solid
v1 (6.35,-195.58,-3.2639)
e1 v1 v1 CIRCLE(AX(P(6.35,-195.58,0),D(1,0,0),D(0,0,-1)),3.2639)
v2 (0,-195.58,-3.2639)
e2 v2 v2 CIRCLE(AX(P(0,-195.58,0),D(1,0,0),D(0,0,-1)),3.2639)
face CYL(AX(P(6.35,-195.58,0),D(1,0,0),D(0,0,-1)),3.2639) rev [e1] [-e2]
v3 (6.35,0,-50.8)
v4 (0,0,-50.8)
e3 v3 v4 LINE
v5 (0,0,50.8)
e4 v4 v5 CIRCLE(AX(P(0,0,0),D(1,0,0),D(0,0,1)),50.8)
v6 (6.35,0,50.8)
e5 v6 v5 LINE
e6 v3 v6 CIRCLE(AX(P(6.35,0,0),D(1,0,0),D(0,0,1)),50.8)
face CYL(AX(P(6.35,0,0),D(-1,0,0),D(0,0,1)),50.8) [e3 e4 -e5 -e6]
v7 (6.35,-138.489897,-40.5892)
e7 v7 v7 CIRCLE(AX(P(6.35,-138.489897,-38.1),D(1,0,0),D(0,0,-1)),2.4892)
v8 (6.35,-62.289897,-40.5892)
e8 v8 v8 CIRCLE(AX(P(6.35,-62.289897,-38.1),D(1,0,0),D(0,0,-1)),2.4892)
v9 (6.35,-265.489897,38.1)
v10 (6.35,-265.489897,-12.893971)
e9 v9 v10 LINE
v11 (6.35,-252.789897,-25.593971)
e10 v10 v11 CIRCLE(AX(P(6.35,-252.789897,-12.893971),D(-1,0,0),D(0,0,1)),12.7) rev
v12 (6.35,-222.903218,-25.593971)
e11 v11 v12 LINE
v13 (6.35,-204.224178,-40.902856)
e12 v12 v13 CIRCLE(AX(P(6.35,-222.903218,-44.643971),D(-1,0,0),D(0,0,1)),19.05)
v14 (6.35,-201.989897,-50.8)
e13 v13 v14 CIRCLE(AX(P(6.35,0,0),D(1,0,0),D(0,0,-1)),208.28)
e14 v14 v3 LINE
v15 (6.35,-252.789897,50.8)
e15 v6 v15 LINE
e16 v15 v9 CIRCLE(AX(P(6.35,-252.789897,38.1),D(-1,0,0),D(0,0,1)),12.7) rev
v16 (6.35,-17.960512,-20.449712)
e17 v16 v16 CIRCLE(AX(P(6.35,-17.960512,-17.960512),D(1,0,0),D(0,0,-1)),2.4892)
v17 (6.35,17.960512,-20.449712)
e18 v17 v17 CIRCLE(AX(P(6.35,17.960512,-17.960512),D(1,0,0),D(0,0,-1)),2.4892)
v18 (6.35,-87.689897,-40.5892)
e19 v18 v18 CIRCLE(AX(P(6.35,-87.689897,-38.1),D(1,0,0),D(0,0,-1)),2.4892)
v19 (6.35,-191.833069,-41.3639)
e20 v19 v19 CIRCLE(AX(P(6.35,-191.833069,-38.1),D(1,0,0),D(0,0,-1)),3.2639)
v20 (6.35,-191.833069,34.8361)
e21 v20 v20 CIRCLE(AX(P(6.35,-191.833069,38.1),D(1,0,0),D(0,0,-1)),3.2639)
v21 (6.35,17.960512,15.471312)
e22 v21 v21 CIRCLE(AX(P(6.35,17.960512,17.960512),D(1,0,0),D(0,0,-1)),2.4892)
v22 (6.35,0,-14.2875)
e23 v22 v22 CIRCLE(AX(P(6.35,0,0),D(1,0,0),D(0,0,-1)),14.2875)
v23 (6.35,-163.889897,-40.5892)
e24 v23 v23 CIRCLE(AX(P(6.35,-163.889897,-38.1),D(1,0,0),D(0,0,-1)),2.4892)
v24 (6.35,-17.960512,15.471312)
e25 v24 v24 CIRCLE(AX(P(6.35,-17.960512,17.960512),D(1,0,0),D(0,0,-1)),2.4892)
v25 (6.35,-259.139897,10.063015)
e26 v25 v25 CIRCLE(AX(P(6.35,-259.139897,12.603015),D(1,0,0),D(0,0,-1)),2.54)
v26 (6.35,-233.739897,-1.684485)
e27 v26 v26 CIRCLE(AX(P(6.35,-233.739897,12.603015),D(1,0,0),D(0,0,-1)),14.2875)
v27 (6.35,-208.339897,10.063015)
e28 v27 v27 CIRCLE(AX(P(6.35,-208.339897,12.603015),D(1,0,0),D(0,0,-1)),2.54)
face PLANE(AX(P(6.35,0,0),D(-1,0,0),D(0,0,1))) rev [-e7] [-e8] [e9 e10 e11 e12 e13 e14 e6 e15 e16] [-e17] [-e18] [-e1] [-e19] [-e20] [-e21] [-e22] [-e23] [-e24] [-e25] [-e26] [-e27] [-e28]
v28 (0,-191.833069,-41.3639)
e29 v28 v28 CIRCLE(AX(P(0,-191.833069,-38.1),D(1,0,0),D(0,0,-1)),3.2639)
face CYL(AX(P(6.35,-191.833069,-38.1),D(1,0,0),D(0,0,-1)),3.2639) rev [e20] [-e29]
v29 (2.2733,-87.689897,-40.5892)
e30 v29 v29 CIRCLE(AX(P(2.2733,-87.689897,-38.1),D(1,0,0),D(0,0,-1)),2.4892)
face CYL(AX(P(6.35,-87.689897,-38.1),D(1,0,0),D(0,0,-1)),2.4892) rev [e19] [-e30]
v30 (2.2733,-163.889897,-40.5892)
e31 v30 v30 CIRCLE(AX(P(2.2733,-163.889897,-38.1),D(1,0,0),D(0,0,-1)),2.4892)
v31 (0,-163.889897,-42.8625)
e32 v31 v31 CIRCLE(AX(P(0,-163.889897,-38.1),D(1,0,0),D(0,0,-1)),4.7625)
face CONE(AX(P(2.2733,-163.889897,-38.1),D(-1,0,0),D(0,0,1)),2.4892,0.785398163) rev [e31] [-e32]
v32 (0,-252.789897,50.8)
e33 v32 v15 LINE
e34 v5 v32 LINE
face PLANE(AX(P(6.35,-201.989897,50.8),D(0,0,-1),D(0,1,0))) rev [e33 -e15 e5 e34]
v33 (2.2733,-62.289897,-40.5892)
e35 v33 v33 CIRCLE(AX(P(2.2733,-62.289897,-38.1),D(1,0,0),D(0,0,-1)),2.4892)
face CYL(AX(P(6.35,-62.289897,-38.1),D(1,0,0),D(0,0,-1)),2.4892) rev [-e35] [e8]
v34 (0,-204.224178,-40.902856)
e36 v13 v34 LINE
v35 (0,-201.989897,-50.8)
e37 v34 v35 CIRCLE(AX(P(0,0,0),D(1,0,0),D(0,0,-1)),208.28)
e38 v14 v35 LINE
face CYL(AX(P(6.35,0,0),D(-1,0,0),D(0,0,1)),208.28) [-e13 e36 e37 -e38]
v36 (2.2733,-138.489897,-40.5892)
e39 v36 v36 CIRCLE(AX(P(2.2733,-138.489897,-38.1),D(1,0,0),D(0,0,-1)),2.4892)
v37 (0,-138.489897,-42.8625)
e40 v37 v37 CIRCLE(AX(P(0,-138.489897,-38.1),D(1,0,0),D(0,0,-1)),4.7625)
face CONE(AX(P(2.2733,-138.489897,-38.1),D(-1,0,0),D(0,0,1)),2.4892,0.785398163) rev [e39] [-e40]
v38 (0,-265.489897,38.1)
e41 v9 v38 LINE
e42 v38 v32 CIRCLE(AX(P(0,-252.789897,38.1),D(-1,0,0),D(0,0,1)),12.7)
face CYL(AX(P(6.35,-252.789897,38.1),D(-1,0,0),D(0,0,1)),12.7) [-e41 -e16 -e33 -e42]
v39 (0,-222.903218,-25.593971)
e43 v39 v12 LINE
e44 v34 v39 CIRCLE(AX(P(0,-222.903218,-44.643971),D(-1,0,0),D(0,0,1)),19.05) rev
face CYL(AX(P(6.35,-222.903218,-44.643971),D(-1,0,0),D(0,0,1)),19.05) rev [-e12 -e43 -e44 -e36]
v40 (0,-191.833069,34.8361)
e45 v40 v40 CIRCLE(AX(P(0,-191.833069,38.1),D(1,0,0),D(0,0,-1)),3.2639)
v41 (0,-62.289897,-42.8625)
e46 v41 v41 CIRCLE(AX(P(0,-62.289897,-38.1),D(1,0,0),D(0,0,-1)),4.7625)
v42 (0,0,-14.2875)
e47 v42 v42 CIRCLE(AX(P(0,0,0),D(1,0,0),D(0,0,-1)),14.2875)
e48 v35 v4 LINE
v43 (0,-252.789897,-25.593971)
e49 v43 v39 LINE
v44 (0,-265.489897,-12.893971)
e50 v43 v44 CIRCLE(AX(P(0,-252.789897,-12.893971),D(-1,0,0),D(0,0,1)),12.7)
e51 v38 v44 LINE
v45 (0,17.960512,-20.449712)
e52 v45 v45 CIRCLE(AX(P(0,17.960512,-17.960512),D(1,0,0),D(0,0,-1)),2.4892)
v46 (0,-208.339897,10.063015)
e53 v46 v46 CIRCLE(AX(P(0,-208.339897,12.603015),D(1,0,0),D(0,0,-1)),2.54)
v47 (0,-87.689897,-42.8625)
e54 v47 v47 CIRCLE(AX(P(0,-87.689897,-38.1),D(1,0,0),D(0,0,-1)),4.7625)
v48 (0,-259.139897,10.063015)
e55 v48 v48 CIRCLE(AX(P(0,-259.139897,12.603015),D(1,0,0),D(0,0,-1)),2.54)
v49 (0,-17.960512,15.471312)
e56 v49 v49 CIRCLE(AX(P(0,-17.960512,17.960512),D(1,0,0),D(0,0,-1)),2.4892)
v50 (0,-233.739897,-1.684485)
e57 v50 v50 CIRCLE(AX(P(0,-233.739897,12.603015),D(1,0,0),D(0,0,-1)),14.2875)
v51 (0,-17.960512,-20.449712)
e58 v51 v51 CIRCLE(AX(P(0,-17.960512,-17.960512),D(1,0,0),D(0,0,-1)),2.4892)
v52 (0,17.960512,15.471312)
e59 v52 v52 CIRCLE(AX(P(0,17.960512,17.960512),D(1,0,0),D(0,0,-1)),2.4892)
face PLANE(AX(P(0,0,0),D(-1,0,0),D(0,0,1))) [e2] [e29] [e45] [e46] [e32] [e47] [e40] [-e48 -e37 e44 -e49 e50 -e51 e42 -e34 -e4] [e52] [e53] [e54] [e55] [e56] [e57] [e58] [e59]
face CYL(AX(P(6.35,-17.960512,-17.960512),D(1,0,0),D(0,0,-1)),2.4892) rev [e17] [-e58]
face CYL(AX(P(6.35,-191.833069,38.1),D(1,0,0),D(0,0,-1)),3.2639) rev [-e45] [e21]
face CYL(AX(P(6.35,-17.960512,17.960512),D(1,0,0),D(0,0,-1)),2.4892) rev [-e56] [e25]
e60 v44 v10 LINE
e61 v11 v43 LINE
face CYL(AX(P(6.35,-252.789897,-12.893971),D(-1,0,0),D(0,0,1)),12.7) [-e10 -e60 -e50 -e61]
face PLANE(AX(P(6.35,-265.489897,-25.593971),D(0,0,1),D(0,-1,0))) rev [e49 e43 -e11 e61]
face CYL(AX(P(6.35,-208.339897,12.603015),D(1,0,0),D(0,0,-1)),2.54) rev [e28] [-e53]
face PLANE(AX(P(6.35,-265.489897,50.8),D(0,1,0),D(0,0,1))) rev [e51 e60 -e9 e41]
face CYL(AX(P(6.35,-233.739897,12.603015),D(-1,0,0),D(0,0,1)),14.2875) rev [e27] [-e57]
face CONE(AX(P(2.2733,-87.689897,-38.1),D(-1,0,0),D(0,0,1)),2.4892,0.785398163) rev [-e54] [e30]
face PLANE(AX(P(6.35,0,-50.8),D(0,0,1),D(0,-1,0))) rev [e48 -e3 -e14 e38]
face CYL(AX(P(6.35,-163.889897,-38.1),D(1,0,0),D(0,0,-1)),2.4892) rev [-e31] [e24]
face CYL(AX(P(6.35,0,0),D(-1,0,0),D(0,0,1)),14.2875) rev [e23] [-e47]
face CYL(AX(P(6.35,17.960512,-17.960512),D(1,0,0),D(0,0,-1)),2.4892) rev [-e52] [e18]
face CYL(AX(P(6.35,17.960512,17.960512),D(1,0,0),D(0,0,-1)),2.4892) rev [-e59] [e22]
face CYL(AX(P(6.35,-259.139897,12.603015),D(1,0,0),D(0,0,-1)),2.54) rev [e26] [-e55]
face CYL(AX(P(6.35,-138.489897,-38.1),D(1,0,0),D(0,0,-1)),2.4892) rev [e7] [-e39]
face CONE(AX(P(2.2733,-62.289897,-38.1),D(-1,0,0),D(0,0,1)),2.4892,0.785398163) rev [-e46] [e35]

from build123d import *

# Parameters (mm, degrees)
SKETCH1_R                           = 14.2875
BOSS_EXTRUDE1_DEPTH                 = 6.35
F_0_257_DIAMETER_HOLE1_D            = 6.5278
F_9_0_2_DIAMETER_HOLE1_D            = 5.08
FILLET2_R                           = 12.7
FILLET1_R                           = 19.05
F_9_0_196_DIAMETER_HOLE1_AT_2_COUNT = 2
F_9_0_196_DIAMETER_HOLE1_AT_2_PITCH = 25.4
F_9_0_196_DIAMETER_HOLE1_AT_3_COUNT = 2
F_9_0_196_DIAMETER_HOLE1_AT_3_PITCH = 76.2
F_9_0_196_DIAMETER_HOLE1_AT_4_COUNT = 2
F_9_0_196_DIAMETER_HOLE1_AT_4_PITCH = 101.6
F_9_0_196_DIAMETER_HOLE2_OUTLINE_R  = 2.4892
F_9_0_196_DIAMETER_HOLE2_DEPTH      = 6.35


# Read off the part's stored shape, not the designer's step: #9 (0.196) Diameter Hole2
with BuildPart() as part:
    # Sketch1 → Boss-Extrude1 (new body)
    with BuildSketch(Plane.YZ):
        with BuildLine():
            Line((0, -50.8), (-201.989896777, -50.8))
            ThreePointArc((-201.989896777, -50.8), (-204.733971085, -38.269563411), (-206.701492618, -25.593970963))
            Line((-206.701492618, -25.593970963), (-265.489896777, -25.593970963))
            Line((-265.489896777, -25.593970963), (-265.489896777, 50.8))
            Line((-265.489896777, 50.8), (-201.989896777, 50.8))
            Line((-201.989896777, 50.8), (0, 50.8))
            ThreePointArc((0, 50.8), (50.8, 0), (0, -50.8))
        make_face()
        with Locations(Location((0, 0, 0), (0, 0, 270))):
            Circle(SKETCH1_R, mode=Mode.SUBTRACT)
        with Locations(Location((-233.739896777, 12.603014519, 0), (0, 0, 270))):
            Circle(SKETCH1_R, mode=Mode.SUBTRACT)
    extrude(amount=BOSS_EXTRUDE1_DEPTH)

    # F (0.257) Diameter Hole1 (through all)
    with Locations(Plane.YZ.offset(6.35)):
        with Locations((0, 0), (-191.833069099, -38.1), (-195.58, 0), (-191.833069099, 38.1)):
            Hole(F_0_257_DIAMETER_HOLE1_D / 2)

    # #9 (0.2) Diameter Hole1 (through all)
    with Locations(Plane.YZ.offset(6.35)):
        with Locations((-259.139896777, 12.603014519), (-208.339896777, 12.603014519)):
            Hole(F_9_0_2_DIAMETER_HOLE1_D / 2)

    # Fillet2
    fillet2_edges = [part.edges().sort_by_distance(p)[0] for p in [
        (3.175, -265.489896777, -25.593970963),
        (3.175, -265.489896777, 50.8),
    ]]
    fillet(fillet2_edges, radius=FILLET2_R)

    # Fillet1
    fillet1_edges = [part.edges().sort_by_distance(p)[0] for p in [
        (3.175, -206.701492618, -25.593970963),
    ]]
    fillet(fillet1_edges, radius=FILLET1_R)

    # Sketch9 → #9 (0.196) Diameter Hole1 (revolve, cut)
    with BuildSketch(Plane(origin=(6.35, -163.889896777, -38.1), x_dir=(0, 0, -1), z_dir=(0, 1, 0))):
        Polygon((0, 0), (0, 6.35), (4.7625, 6.35), (2.4892, 4.0767), (2.4892, 0), align=None)
    f_9_0_196_diameter_hole1 = revolve(axis=Axis((12.7, -163.889896777, -38.1), (-1, 0, 0)), mode=Mode.SUBTRACT)

    # #9 (0.196) Diameter Hole1 at 2: #9 (0.196) Diameter Hole1 ×2
    with Locations(*[(0, i * F_9_0_196_DIAMETER_HOLE1_AT_2_PITCH, 0) for i in range(1, F_9_0_196_DIAMETER_HOLE1_AT_2_COUNT)]):
        add(f_9_0_196_diameter_hole1, mode=Mode.SUBTRACT)

    # #9 (0.196) Diameter Hole1 at 3: #9 (0.196) Diameter Hole1 ×2
    with Locations(*[(0, i * F_9_0_196_DIAMETER_HOLE1_AT_3_PITCH, 0) for i in range(1, F_9_0_196_DIAMETER_HOLE1_AT_3_COUNT)]):
        add(f_9_0_196_diameter_hole1, mode=Mode.SUBTRACT)

    # #9 (0.196) Diameter Hole1 at 4: #9 (0.196) Diameter Hole1 ×2
    with Locations(*[(0, i * F_9_0_196_DIAMETER_HOLE1_AT_4_PITCH, 0) for i in range(1, F_9_0_196_DIAMETER_HOLE1_AT_4_COUNT)]):
        add(f_9_0_196_diameter_hole1, mode=Mode.SUBTRACT)

    # #9 (0.196) Diameter Hole2 outline → #9 (0.196) Diameter Hole2 (cut)
    with BuildSketch(Plane.YZ):
        with Locations((-17.960512242, -17.960512242)):
            Circle(F_9_0_196_DIAMETER_HOLE2_OUTLINE_R)
        with Locations((17.960512242, -17.960512242)):
            Circle(F_9_0_196_DIAMETER_HOLE2_OUTLINE_R)
        with Locations((17.960512242, 17.960512242)):
            Circle(F_9_0_196_DIAMETER_HOLE2_OUTLINE_R)
        with Locations((-17.960512242, 17.960512242)):
            Circle(F_9_0_196_DIAMETER_HOLE2_OUTLINE_R)
    extrude(amount=F_9_0_196_DIAMETER_HOLE2_DEPTH, mode=Mode.SUBTRACT)


solid = part.part
